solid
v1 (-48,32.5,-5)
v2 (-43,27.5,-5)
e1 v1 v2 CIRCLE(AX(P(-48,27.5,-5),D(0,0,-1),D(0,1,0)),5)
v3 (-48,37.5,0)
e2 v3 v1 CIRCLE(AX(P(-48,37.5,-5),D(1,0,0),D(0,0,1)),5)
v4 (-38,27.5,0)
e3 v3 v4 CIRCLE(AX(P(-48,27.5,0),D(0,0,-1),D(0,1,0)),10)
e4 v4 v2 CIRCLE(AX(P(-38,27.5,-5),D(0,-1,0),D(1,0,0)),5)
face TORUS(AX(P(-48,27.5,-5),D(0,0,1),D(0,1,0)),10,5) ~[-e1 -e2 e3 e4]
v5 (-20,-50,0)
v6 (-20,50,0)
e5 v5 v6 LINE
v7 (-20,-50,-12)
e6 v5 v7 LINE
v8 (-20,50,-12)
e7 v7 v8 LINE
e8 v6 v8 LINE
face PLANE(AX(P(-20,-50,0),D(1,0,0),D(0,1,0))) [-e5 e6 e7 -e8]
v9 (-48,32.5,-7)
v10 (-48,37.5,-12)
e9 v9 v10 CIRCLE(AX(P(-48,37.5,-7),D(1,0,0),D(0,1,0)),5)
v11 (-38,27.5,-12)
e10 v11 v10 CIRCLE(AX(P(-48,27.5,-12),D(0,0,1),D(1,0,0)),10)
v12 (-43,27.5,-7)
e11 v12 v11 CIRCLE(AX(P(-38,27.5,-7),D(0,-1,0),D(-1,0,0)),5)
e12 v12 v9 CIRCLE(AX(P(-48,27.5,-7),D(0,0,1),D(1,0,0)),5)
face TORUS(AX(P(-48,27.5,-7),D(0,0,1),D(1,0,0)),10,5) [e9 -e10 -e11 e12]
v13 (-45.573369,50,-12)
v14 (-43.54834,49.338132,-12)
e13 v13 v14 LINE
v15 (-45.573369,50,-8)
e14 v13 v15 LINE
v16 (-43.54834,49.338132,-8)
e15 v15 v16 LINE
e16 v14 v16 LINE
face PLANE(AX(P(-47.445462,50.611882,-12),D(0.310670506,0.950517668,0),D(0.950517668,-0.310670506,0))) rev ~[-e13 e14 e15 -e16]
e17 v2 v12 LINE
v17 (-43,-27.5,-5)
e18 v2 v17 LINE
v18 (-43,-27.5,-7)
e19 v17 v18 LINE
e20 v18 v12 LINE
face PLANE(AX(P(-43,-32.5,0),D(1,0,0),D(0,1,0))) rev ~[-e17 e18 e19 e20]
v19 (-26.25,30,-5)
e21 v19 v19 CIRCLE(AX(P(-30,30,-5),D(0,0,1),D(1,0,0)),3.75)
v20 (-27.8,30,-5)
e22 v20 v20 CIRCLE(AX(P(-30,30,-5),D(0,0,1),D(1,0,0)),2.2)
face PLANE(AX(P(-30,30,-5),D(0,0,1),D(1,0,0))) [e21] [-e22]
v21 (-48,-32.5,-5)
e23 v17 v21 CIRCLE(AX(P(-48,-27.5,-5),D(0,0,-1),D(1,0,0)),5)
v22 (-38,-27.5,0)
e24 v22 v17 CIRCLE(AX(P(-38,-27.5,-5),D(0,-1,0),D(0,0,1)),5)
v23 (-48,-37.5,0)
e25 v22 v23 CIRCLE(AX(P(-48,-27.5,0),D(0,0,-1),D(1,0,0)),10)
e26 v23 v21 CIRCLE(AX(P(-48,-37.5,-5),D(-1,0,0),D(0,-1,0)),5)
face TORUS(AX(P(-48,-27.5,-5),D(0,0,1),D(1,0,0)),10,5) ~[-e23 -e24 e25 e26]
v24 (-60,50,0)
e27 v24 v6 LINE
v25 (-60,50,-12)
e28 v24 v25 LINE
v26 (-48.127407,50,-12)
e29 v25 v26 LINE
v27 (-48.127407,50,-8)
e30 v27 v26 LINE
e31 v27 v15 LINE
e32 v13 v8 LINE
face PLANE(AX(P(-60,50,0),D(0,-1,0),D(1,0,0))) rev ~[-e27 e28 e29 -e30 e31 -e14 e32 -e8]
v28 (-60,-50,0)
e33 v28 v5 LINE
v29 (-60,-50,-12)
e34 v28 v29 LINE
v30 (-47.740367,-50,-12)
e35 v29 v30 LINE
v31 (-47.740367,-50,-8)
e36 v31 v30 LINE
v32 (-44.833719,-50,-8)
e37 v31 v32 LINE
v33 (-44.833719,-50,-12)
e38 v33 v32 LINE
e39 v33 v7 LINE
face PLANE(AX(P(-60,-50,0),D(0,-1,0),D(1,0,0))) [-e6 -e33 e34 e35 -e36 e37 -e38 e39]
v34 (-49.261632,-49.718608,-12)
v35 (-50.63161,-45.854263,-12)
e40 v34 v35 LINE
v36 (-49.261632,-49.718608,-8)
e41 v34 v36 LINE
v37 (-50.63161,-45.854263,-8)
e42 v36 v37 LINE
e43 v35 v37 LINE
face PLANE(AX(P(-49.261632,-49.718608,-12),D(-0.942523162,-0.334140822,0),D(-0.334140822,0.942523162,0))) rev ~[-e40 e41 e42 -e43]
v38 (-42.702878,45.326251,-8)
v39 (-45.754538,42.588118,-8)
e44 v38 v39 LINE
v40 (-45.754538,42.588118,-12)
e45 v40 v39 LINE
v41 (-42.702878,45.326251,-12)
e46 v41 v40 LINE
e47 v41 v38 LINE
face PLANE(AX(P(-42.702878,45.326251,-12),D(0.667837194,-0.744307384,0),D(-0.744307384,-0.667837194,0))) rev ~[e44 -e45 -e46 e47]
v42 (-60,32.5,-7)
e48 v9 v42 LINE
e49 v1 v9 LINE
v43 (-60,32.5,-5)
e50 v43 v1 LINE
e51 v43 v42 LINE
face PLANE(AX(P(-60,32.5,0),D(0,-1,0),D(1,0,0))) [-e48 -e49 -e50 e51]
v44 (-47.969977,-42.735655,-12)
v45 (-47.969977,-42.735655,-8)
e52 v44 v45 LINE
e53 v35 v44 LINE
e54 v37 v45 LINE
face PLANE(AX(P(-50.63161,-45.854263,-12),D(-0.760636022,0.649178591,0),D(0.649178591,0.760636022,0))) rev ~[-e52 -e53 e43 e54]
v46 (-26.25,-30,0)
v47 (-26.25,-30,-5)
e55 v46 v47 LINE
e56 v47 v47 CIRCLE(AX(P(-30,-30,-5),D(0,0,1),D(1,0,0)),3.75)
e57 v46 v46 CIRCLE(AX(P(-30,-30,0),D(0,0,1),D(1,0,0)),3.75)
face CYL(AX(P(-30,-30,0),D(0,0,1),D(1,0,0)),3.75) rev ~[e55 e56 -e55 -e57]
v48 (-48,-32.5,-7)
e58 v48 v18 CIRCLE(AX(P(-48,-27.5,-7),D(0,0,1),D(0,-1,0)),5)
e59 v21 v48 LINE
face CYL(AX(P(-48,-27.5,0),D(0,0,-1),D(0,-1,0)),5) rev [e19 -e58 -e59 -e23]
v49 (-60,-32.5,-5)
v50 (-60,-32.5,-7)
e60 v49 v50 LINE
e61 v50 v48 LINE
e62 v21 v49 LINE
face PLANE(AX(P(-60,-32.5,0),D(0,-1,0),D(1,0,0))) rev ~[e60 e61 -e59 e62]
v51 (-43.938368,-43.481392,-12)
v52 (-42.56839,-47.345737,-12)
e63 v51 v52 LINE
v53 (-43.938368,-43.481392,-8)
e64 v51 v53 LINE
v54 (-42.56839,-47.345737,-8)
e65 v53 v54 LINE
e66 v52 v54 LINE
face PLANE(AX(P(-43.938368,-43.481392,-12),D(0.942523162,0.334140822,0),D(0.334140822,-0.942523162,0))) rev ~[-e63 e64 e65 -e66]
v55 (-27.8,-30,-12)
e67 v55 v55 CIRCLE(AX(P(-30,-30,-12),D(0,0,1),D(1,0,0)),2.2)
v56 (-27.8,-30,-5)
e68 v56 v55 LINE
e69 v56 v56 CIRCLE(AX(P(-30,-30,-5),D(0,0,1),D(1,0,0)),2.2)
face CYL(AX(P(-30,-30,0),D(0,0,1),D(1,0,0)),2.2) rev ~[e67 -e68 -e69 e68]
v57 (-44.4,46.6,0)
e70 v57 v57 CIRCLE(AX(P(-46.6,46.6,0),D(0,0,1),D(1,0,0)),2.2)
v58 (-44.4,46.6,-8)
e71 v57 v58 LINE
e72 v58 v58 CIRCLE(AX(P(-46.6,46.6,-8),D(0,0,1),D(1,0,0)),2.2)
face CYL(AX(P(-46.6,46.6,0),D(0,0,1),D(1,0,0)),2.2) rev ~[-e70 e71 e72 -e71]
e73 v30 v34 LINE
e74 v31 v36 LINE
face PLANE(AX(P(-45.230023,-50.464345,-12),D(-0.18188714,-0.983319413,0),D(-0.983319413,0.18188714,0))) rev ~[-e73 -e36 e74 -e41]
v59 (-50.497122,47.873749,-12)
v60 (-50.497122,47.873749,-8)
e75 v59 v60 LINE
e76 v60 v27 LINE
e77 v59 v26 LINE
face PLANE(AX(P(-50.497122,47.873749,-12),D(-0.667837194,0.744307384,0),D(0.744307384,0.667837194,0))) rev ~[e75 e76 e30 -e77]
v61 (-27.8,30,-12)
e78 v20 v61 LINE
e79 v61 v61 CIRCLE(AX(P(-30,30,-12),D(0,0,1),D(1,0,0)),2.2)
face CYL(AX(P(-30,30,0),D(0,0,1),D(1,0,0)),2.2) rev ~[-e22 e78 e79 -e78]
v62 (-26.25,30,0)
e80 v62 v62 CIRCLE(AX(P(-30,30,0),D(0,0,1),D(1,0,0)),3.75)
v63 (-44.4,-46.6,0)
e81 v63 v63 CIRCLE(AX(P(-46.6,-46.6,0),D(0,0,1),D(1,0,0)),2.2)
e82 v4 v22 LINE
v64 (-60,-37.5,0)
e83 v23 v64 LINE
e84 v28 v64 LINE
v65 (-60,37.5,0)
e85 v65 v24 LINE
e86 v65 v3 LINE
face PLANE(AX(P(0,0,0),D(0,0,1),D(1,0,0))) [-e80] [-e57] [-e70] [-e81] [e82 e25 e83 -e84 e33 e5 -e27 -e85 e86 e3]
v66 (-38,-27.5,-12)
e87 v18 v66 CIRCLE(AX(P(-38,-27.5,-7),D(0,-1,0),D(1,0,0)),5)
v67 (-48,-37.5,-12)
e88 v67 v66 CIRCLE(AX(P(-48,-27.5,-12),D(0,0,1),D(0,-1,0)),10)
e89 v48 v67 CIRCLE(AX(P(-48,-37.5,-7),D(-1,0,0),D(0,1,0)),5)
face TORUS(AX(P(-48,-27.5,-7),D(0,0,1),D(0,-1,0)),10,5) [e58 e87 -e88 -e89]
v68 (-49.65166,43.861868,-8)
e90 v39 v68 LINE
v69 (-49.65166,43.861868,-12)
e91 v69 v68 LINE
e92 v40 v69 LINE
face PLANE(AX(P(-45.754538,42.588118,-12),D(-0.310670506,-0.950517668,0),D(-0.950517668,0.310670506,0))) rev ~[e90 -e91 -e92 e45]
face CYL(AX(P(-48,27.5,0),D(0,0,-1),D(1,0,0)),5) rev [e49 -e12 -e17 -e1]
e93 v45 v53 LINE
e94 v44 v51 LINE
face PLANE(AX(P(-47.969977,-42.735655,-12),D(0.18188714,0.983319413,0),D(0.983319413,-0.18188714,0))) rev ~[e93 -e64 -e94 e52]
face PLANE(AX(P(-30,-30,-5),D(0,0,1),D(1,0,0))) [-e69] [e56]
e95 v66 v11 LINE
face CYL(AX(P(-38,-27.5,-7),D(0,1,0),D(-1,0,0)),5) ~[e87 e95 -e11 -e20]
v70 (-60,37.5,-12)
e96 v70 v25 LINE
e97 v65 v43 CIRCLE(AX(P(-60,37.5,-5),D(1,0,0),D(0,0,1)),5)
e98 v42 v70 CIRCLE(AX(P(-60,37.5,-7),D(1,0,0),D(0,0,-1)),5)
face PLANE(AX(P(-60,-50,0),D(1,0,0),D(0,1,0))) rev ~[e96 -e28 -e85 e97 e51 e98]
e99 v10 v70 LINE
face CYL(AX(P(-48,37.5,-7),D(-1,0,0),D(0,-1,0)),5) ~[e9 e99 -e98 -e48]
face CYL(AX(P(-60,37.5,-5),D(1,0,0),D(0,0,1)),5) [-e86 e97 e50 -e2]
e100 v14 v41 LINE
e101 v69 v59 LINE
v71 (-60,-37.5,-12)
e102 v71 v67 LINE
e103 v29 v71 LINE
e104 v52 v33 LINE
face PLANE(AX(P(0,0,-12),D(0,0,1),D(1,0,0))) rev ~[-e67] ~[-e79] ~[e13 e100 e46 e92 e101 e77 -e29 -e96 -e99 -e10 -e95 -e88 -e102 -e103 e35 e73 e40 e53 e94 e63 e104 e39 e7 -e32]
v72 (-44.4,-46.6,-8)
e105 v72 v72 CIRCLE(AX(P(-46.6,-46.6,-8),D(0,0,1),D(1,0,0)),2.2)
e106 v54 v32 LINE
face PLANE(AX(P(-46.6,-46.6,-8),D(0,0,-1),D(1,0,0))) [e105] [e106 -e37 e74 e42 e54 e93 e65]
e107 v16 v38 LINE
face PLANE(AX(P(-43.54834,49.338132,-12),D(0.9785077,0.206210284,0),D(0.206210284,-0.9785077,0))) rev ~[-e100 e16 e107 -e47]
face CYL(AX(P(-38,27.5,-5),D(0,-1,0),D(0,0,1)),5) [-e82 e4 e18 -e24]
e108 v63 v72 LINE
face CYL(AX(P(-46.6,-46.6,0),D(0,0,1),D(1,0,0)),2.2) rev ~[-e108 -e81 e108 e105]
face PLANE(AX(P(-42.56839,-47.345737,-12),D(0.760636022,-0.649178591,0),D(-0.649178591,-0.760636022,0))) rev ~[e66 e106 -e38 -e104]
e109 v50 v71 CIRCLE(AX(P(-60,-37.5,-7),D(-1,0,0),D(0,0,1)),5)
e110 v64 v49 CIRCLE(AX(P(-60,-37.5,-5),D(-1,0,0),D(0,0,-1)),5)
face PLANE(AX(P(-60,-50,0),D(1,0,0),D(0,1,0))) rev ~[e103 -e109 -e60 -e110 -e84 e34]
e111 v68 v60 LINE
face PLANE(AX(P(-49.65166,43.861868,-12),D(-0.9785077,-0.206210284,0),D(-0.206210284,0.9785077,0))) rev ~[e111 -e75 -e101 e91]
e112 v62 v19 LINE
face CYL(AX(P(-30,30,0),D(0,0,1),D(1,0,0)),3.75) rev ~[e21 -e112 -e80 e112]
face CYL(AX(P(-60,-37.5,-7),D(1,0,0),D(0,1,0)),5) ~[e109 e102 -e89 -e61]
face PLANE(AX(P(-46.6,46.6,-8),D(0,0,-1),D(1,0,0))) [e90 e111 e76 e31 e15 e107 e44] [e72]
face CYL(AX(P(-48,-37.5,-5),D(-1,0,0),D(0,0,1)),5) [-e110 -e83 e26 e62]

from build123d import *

# Parameters (mm, degrees)
F0_W     = 120
F0_H     = 100
F0_R     = 2.2
F1_DEPTH = 12
F2_R     = 3.75
F3_DEPTH = 5
F5_DEPTH = 4
F6_W     = 80
F6_H     = 100
F7_DEPTH = 25
F8_W     = 17
F8_H     = 65
F9_DEPTH = 25
F10_F1_R = 5
F10_F2_R = 5
F10_F3_R = 5


with BuildPart() as f1:
    # F0 (on Top) → F1 (new body)
    with BuildSketch(Plane.XY):
        Rectangle(F0_W, F0_H)
        with Locations((-46.6, -46.6)):
            Circle(F0_R, mode=Mode.SUBTRACT)
        with Locations((-30, -30)):
            Circle(F0_R, mode=Mode.SUBTRACT)
        with Locations((46.6, -46.6)):
            Circle(F0_R, mode=Mode.SUBTRACT)
        with Locations((30, -30)):
            Circle(F0_R, mode=Mode.SUBTRACT)
        with Locations((-46.6, 46.6)):
            Circle(F0_R, mode=Mode.SUBTRACT)
        with Locations((-30, 30)):
            Circle(F0_R, mode=Mode.SUBTRACT)
        with Locations((30, 30)):
            Circle(F0_R, mode=Mode.SUBTRACT)
        with Locations((46.6, 46.6)):
            Circle(F0_R, mode=Mode.SUBTRACT)
    extrude(amount=-F1_DEPTH)

    # F2 (on face) → F3 (cut)
    with BuildSketch(Plane.XY):
        with Locations((-30, 30)):
            Circle(F2_R)
        with Locations((30, 30)):
            Circle(F2_R)
        with Locations((30, -30)):
            Circle(F2_R)
        with Locations((-30, -30)):
            Circle(F2_R)
    extrude(amount=-F3_DEPTH, mode=Mode.SUBTRACT)

    # F4 (on face) → F5 (cut)
    with BuildSketch(Plane(origin=(0, 0, -12), x_dir=(1, 0, 0), z_dir=(0, 0, -1))):
        Polygon((-43.9383677783, 43.4813923112), (-42.5683904062, 47.3457372751), (-45.2300226279, 50.4643449639), (-49.2616322217, 49.7186076888), (-50.6316095938, 45.8542627249), (-47.9699773721, 42.7356550361), align=None)
        Polygon((46.3647294593, 42.5067558376), (50.0272181581, 44.3496276538), (50.2624886989, 48.4428718162), (46.8352705407, 50.6932441624), (43.1727818419, 48.8503723462), (42.9375113011, 44.7571281838), align=None)
        Polygon((-42.702877562, -45.3262509262), (-45.754537837, -42.5881184301), (-49.651660275, -43.8618675039), (-50.497122438, -47.8737490738), (-47.445462163, -50.6118815699), (-43.548339725, -49.3381324961), align=None)
        Polygon((50.5258183882, -45.4176506509), (47.5389646216, -42.6089668707), (43.6131462335, -43.7913162197), (42.6741816118, -47.7823493491), (45.6610353784, -50.5910331293), (49.5868537665, -49.4086837803), align=None)
    extrude(amount=-F5_DEPTH, mode=Mode.SUBTRACT)

    # F6 (on face) → F7 (cut)
    with BuildSketch(Plane.XY):
        with Locations((20, 0)):
            Rectangle(F6_W, F6_H)
    extrude(amount=-F7_DEPTH, mode=Mode.SUBTRACT)

    # F8 (on face) → F9 (cut)
    with BuildSketch(Plane.XY):
        with Locations((-51.5, 0)):
            Rectangle(F8_W, F8_H)
    extrude(amount=-F9_DEPTH, mode=Mode.SUBTRACT)

    # F10: fillet of radius 5 on 5 edges, made by hand

    # F10_f1
    f10_f1_edges = [f1.edges().sort_by_distance(p)[0] for p in [
        (-43, 32.5, -6),
        (-43, -32.5, -6),
    ]]
    fillet(f10_f1_edges, radius=F10_F1_R)

    # F10_f2
    f10_f2_edges = [f1.edges().sort_by_distance(p)[0] for p in [
        (-43, 0, -12),
        (-44.4644660941, -31.0355339059, -12),
        (-44.4644660941, 31.0355339059, -12),
    ]]
    fillet(f10_f2_edges, radius=F10_F2_R)

    # F10_f3
    f10_f3_edges = [f1.edges().sort_by_distance(p)[0] for p in [
        (-54, 32.5, 0),
        (-43, 0, 0),
        (-44.4644660941, -31.0355339059, 0),
        (-44.4644660941, 31.0355339059, 0),
    ]]
    fillet(f10_f3_edges, radius=F10_F3_R)


solid = f1.part
